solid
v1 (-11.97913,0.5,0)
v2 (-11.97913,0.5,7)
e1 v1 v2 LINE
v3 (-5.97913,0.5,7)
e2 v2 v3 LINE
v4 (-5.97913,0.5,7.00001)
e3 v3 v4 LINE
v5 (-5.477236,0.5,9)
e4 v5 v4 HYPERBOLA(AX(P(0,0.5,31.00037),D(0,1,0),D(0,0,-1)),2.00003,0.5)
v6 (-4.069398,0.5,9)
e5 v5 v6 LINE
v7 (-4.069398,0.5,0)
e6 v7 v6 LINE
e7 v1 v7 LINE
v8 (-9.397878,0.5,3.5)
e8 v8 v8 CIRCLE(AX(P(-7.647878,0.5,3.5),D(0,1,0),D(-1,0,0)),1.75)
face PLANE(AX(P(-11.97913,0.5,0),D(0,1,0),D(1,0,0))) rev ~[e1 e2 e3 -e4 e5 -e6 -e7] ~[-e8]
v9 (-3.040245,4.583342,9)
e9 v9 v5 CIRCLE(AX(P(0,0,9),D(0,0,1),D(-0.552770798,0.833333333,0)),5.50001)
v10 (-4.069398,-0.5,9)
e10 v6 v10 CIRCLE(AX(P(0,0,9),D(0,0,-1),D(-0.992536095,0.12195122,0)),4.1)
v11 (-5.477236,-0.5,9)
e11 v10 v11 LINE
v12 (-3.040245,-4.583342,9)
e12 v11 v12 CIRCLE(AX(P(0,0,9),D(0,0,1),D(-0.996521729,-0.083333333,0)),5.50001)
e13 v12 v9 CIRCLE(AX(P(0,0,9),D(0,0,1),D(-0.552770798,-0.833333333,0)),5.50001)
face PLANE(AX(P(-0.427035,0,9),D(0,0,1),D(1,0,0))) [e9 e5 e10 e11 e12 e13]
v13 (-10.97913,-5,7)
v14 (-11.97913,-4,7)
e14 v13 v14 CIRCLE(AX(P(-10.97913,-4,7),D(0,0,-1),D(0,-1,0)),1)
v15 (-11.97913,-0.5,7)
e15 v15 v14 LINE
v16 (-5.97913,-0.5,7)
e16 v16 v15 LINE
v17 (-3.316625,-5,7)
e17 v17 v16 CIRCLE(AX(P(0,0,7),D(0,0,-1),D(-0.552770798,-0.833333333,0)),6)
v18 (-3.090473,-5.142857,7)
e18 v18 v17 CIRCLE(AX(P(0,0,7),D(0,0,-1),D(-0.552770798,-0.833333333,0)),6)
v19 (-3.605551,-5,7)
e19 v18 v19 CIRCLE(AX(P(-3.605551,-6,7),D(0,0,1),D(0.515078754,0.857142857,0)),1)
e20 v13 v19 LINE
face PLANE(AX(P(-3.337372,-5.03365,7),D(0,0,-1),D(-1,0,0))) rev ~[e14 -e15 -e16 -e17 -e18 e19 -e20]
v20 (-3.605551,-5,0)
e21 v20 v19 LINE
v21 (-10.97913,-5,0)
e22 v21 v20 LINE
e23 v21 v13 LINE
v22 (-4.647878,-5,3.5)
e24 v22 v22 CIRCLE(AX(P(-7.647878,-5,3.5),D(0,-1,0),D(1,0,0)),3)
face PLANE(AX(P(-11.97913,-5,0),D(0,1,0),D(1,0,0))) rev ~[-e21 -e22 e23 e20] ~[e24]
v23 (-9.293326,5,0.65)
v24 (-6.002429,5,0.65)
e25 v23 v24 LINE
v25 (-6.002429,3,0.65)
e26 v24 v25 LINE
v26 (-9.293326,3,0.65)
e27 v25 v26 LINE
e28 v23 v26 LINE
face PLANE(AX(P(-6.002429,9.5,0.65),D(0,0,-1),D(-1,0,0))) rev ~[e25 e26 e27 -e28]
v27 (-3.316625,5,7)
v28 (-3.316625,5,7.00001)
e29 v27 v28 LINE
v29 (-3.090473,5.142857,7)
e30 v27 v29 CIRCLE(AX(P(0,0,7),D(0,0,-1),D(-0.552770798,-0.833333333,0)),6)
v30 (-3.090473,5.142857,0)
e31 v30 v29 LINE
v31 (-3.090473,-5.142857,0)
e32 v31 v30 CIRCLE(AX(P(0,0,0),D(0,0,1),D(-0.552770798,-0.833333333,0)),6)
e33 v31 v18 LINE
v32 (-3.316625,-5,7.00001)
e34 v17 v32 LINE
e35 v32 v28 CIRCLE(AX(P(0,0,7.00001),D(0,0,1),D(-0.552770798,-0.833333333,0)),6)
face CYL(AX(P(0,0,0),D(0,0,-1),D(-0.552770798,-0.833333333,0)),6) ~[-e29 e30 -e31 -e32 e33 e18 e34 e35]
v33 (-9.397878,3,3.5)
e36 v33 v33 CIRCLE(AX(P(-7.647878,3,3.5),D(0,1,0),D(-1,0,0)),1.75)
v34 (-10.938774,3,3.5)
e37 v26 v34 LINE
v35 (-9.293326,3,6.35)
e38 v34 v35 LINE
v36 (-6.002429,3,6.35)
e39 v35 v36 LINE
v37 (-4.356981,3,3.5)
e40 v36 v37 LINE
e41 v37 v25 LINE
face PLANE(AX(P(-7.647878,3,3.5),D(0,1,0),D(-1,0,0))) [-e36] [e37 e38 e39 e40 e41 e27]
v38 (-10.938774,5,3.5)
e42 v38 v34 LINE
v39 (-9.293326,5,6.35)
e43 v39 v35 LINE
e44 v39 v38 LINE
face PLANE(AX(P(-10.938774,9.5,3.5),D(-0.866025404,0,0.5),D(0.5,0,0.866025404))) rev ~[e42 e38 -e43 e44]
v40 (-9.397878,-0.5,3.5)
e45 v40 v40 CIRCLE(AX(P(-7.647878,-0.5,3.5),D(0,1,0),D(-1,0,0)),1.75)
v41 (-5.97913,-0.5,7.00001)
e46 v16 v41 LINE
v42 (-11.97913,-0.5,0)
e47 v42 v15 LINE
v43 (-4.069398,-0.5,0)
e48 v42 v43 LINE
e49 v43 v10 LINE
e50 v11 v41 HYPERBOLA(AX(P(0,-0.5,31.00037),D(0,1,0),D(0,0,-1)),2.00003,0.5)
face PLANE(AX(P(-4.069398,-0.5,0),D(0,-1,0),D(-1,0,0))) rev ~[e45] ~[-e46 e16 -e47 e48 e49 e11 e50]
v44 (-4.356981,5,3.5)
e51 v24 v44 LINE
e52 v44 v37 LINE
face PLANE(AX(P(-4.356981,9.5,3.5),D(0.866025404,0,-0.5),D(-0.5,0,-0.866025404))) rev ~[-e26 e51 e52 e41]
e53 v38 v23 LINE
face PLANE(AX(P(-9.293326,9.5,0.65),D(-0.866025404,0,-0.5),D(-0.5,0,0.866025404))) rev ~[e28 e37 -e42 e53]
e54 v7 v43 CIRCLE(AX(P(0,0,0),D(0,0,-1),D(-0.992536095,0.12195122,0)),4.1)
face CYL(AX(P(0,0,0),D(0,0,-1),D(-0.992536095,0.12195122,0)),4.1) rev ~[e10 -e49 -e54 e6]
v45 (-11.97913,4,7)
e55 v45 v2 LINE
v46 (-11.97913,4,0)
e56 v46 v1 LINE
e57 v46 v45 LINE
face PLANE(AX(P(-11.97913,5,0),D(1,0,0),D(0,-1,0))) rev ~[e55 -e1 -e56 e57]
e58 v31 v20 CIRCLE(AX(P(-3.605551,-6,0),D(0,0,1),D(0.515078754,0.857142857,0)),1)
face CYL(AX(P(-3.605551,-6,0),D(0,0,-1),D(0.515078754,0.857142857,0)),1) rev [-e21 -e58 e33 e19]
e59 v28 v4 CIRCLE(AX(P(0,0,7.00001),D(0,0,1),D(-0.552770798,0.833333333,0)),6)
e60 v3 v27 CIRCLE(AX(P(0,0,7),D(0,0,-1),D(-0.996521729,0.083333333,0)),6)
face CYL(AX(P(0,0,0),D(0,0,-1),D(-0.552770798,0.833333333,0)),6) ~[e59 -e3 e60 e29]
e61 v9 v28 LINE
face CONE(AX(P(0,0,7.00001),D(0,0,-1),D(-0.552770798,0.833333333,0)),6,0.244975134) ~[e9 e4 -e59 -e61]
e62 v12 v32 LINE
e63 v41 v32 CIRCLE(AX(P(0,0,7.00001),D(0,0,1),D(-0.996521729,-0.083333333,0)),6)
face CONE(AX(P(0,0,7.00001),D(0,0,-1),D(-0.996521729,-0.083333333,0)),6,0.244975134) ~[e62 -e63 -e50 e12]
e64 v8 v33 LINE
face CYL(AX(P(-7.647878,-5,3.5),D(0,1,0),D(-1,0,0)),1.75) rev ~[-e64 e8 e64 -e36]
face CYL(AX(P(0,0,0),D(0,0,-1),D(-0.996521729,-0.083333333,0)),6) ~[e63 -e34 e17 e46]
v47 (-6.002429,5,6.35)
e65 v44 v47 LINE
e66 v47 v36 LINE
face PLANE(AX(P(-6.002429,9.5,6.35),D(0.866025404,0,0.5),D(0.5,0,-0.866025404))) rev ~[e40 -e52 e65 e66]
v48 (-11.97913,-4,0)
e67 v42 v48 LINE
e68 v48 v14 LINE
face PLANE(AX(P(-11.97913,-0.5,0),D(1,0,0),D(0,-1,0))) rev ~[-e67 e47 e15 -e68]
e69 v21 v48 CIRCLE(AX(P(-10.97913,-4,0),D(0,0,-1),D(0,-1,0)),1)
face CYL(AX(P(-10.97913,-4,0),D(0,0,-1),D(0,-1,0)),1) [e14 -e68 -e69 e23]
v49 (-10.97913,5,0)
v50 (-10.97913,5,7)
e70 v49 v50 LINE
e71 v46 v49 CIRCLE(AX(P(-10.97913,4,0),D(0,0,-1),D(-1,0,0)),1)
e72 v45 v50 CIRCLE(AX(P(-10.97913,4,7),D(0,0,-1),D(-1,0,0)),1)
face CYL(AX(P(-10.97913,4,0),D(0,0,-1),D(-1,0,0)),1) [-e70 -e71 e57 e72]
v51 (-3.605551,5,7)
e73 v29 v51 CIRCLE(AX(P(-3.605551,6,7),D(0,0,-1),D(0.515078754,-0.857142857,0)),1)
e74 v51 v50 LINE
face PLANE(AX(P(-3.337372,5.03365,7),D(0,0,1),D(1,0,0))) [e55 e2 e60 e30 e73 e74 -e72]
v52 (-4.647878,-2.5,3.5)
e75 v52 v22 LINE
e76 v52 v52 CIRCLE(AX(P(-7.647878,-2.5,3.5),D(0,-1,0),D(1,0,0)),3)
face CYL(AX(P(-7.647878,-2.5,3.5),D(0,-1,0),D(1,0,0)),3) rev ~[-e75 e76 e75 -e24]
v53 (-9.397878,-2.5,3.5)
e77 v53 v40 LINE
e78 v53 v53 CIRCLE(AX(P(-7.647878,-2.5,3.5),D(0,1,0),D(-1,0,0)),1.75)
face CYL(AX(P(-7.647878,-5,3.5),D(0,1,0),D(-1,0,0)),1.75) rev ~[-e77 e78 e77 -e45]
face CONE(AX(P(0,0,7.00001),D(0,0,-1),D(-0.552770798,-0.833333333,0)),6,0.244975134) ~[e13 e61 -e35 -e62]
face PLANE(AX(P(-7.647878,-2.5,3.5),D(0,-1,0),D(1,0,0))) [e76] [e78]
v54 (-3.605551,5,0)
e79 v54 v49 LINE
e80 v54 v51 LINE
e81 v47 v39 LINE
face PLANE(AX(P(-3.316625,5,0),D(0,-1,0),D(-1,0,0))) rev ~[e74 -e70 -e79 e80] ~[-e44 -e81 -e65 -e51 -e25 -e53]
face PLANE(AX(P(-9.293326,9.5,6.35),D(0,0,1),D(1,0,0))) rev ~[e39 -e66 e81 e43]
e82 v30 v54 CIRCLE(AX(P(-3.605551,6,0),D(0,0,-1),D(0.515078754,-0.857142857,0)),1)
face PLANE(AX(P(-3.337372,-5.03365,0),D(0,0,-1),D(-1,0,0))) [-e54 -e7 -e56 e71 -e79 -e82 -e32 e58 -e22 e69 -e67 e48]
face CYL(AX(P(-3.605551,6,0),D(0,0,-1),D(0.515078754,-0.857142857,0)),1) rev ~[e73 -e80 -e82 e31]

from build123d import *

# Parameters (mm, degrees)
F1_DEPTH       = 9
F2_DEPTH       = 7
F7_D           = 3.5
F7_START       = 4.5
F7_CBORE_D     = 6
F7_CBORE_DEPTH = 2.5
F8_DEPTH       = 6.5
F9_SIZE2       = 1.99999
F9_SIZE        = 0.49999
F10_T1_DEPTH   = 7
F10_T3_DEPTH   = 7


# Not quite as in the source:
# - a fillet or chamfer that OpenCascade refuses, or shapes differently, is made with other operations: its cross-section is extruded or revolved along the edge and cut away or added
# - a fillet or chamfer is up to 0.001 mm smaller than in the source, because OpenCascade refuses the exact size


with BuildPart() as f1:
    # F0 (on Top) → F1 (new body)
    with BuildSketch(Plane.XY):
        with BuildLine():
            ThreePointArc((-4.0693979899, 0.5), (4.1, 0), (-4.0693979899, -0.5))
            Line((-4.0693979899, -0.5), (-5.9791303716, -0.5))
            ThreePointArc((-5.9791303716, -0.5), (-5.1638421749, -3.0552796914), (-3.3166247904, -5))
            ThreePointArc((-3.3166247904, -5), (6, 0), (-3.3166247904, 5))
            ThreePointArc((-3.3166247904, 5), (-5.1638421749, 3.0552796914), (-5.9791303716, 0.5))
            Line((-5.9791303716, 0.5), (-4.0693979899, 0.5))
        make_face()
    extrude(amount=F1_DEPTH)

    # F0 (on Top) → F2 (join)
    with BuildSketch(Plane.XY):
        with BuildLine():
            Line((-11.9791303716, 0.5), (-5.9791303716, 0.5))
            ThreePointArc((-5.9791303716, 0.5), (-5.1638421749, 3.0552796914), (-3.3166247904, 5))
            Line((-3.3166247904, 5), (-11.9791303716, 5))
            Line((-11.9791303716, 5), (-11.9791303716, 0.5))
        make_face()
        with BuildLine():
            ThreePointArc((-3.3166247904, -5), (-5.1638421749, -3.0552796914), (-5.9791303716, -0.5))
            Line((-5.9791303716, -0.5), (-11.9791303716, -0.5))
            Line((-11.9791303716, -0.5), (-11.9791303716, -5))
            Line((-11.9791303716, -5), (-3.3166247904, -5))
        make_face()
    extrude(amount=F2_DEPTH)

    # F7 (through all)
    # its depths count from where the whole tool has entered the part; down to there all is cleared
    with Locations(Plane.XZ.offset(9.5).offset(-F7_START)):
        with Locations((-7.647877581, 3.5)):
            CounterBoreHole(F7_D / 2, F7_CBORE_D / 2, F7_CBORE_DEPTH)

    # F6 (on offset) → F8 (cut)
    with BuildSketch(Plane(origin=(0, 9.5, 0), x_dir=(-1, 0, 0), z_dir=(0, 1, 0))):
        Polygon((6.0024293138, 0.65), (9.2933258481, 0.65), (10.9387741153, 3.5), (9.2933258481, 6.35), (6.0024293138, 6.35), (4.3569810466, 3.5), align=None)
    extrude(amount=-F8_DEPTH, mode=Mode.SUBTRACT)

    # F9 (size 0.5 and 2 in the source; OpenCascade refuses exactly that, so slightly less here)
    f9_edges = [f1.edges().sort_by_distance(p)[0] for p in [
        (5.400488, -2.614332, 9),
    ]]
    f9_side = f1.faces().sort_by_distance((-5.017914, 2.968938, 9))[0]
    chamfer(f9_edges, length=F9_SIZE, length2=F9_SIZE2, reference=f9_side)

    # F10: fillet of radius 1 on 4 edges, made by hand

    # F10_s2 → F10_t1 (join)
    with BuildSketch(Plane.XY):
        with BuildLine():
            ThreePointArc((-3.0904725218, -5.1428571429), (-3.3382900336, -5.0363758883), (-3.6055512755, -5))
            Line((-3.6055512755, -5), (-3.6055512755, -4.98))
            Line((-3.6055512755, -4.98), (-3.3166247904, -4.98))
            Line((-3.3166247904, -4.98), (-3.3055693744, -4.9833333333))
            ThreePointArc((-3.3055693744, -4.9833333333), (-3.1936637184, -5.0557800638), (-3.0801709468, -5.1257142857))
            Line((-3.0801709468, -5.1257142857), (-3.0904725218, -5.1428571429))
        make_face()
        with BuildLine():
            ThreePointArc((-3.0904725218, 5.1428571429), (-3.3382900336, 5.0363758883), (-3.6055512755, 5))
            Line((-3.6055512755, 5), (-3.6055512755, 4.98))
            Line((-3.6055512755, 4.98), (-3.3166247904, 4.98))
            Line((-3.3166247904, 4.98), (-3.3055693744, 4.9833333333))
            ThreePointArc((-3.3055693744, 4.9833333333), (-3.1936637184, 5.0557800638), (-3.0801709468, 5.1257142857))
            Line((-3.0801709468, 5.1257142857), (-3.0904725218, 5.1428571429))
        make_face()
    extrude(amount=F10_T1_DEPTH)

    # F10_s4 → F10_t3 (cut)
    with BuildSketch(Plane.XY):
        with BuildLine():
            ThreePointArc((-10.9791303716, -5), (-11.6862371527, -4.7071067812), (-11.9791303716, -4))
            Line((-11.9791303716, -4), (-11.9991303716, -4))
            Line((-11.9991303716, -4), (-11.9991303716, -5.02))
            Line((-11.9991303716, -5.02), (-10.9791303716, -5.02))
            Line((-10.9791303716, -5.02), (-10.9791303716, -5))
        make_face()
        with BuildLine():
            ThreePointArc((-11.9791303716, 4), (-11.6862371527, 4.7071067812), (-10.9791303716, 5))
            Line((-10.9791303716, 5), (-10.9791303716, 5.02))
            Line((-10.9791303716, 5.02), (-11.9991303716, 5.02))
            Line((-11.9991303716, 5.02), (-11.9991303716, 4))
            Line((-11.9991303716, 4), (-11.9791303716, 4))
        make_face()
    extrude(amount=F10_T3_DEPTH, mode=Mode.SUBTRACT)


solid = f1.part
